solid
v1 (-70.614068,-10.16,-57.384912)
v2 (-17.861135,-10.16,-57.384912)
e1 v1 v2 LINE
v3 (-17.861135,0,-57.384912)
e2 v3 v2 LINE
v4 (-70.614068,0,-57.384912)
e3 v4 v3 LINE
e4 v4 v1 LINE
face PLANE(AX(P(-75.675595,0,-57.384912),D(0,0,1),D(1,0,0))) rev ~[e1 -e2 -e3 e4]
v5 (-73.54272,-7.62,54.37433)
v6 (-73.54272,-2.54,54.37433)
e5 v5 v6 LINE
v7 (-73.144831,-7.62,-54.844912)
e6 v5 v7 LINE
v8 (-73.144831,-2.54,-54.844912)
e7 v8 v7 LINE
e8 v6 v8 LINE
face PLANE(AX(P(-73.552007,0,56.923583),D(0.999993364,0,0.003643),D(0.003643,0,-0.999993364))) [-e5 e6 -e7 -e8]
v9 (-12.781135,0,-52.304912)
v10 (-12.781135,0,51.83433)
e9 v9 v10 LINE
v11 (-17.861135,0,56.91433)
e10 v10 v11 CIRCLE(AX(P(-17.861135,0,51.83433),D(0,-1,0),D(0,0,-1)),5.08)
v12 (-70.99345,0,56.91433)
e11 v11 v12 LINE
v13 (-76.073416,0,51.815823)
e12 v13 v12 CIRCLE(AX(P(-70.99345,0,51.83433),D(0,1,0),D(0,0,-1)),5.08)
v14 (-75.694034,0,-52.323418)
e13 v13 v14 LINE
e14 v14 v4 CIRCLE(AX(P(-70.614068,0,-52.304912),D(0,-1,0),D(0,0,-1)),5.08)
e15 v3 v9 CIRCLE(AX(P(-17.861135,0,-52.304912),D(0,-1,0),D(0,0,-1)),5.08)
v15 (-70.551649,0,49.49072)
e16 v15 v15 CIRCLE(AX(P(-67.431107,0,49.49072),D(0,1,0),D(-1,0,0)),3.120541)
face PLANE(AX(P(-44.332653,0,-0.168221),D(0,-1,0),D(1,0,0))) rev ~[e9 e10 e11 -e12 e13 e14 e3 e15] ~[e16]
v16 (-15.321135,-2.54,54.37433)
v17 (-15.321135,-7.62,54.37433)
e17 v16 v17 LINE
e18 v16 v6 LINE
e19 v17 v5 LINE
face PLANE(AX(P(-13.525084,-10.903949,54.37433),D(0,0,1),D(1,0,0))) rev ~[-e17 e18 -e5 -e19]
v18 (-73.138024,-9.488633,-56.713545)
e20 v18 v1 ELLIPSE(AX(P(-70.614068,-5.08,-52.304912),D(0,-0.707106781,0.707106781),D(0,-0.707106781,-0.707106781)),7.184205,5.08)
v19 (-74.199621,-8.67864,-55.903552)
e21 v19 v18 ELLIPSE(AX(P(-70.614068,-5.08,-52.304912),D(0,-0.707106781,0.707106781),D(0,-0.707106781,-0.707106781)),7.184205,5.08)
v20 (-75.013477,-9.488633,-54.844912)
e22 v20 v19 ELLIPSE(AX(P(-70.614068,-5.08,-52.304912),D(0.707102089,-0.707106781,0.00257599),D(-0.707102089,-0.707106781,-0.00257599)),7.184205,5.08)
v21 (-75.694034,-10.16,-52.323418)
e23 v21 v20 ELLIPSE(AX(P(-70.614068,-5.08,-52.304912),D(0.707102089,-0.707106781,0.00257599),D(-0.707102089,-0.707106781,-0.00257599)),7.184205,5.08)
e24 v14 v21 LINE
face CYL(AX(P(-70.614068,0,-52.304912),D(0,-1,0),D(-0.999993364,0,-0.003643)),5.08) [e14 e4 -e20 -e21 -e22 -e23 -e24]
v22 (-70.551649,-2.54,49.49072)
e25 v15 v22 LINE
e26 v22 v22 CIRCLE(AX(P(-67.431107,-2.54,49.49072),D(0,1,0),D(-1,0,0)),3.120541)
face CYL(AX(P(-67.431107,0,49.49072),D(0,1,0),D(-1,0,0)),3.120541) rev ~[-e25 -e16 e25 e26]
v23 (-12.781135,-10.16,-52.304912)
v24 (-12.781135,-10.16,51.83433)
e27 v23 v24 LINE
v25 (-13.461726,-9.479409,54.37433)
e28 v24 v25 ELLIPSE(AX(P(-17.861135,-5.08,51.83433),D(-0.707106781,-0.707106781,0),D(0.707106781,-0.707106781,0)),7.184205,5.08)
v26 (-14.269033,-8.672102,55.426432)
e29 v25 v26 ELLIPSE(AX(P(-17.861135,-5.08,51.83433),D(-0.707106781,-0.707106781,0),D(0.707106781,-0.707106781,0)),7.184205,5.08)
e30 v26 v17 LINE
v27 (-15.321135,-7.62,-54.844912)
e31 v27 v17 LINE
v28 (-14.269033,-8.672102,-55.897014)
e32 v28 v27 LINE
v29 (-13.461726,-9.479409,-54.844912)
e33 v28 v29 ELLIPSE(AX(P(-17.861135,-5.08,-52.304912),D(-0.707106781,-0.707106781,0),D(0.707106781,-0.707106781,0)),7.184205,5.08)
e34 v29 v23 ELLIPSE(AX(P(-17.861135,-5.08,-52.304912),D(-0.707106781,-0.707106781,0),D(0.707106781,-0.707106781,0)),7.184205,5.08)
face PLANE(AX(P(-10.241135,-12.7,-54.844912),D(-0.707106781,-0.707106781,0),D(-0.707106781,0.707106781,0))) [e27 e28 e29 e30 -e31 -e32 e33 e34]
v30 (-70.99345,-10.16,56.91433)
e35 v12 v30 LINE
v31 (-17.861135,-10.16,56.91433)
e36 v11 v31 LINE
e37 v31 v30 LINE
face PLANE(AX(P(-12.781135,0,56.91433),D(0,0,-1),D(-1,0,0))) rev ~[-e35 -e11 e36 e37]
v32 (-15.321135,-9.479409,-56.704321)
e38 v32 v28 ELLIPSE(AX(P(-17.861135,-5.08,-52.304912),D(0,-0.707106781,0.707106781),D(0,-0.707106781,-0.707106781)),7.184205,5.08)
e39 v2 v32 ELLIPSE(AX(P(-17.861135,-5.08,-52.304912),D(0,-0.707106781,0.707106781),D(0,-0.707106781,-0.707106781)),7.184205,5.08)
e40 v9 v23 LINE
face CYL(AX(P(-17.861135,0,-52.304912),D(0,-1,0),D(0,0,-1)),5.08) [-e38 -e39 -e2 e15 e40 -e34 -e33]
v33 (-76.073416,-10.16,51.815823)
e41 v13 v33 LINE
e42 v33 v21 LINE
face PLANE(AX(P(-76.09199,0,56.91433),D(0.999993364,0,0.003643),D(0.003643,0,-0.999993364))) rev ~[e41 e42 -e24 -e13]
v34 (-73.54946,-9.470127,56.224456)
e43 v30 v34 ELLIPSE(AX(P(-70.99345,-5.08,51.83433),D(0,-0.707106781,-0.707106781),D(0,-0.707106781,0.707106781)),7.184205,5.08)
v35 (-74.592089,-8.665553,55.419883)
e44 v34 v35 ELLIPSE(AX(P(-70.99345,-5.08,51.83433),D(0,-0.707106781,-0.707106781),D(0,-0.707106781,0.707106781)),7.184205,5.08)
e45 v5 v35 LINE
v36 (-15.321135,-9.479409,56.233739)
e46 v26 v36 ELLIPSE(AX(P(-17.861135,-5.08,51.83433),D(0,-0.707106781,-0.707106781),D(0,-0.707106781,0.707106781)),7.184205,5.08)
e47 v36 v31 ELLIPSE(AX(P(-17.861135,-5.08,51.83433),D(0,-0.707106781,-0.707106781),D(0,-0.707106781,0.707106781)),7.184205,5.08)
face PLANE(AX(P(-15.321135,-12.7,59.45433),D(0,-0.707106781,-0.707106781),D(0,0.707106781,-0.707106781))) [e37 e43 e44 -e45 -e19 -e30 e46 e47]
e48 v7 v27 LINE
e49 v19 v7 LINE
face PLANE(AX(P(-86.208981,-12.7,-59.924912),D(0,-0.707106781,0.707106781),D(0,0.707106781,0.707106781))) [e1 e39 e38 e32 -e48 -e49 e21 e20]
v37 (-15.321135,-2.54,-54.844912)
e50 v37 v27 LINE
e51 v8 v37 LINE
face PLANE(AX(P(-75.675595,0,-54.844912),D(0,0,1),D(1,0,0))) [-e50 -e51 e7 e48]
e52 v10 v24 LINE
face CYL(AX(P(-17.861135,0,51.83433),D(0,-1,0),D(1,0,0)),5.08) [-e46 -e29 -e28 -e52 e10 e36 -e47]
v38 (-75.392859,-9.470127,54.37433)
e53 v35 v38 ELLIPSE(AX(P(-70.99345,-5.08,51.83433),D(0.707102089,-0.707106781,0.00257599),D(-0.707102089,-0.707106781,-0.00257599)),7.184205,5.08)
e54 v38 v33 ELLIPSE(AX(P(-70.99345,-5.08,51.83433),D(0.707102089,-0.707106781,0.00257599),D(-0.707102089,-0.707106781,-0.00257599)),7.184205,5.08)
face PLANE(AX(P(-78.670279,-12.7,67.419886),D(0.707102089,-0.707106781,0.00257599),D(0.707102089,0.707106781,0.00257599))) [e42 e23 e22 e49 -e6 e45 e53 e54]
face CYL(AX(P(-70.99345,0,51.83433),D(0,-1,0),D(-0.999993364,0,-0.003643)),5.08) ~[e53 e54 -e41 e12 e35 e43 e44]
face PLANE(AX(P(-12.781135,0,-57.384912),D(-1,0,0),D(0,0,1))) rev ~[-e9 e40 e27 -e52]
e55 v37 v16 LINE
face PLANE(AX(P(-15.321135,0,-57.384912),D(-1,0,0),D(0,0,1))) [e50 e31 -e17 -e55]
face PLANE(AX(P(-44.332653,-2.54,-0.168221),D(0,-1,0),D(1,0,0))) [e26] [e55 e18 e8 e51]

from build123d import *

# Parameters (mm, degrees)
F1_DEPTH     = 12.7
F2_T         = -2.54
F3_R         = 5.08
F4_T1_DEPTH  = 109.2192415341
F4_T6_DEPTH  = 70.8878458195
F4_T11_DEPTH = 71.2857341695
F4_T16_DEPTH = 135.3482654479
F4_T23_DEPTH = 70.8878458195
F4_S24_R     = 5.08
F4_T25_DEPTH = 37
F4_T29_DEPTH = 135.3482654479
F4_S30_R     = 5.08
F4_T31_DEPTH = 69
F4_T38_DEPTH = 122.283391113
F4_S39_R     = 5.08
F4_T40_DEPTH = 63
F4_T44_DEPTH = 83.9519953984
F4_S45_R     = 5.08
F4_T46_DEPTH = 44
F4_T53_DEPTH = 84.3498837483
F4_S54_R     = 5.08
F4_T55_DEPTH = 44
F4_T59_DEPTH = 122.283391113
F4_S60_R     = 5.08
F4_T61_DEPTH = 63
F4_T68_DEPTH = 71.2857341695
F4_S69_R     = 5.08
F4_T70_DEPTH = 37
F4_T74_DEPTH = 135.3482654479
F4_S75_R     = 5.08
F4_T76_DEPTH = 69
F5_R         = 3.1205414485
F6_DEPTH     = 25.4


# Not quite as in the source:
# - a fillet or chamfer that OpenCascade refuses, or shapes differently, is made with other operations: its cross-section is extruded or revolved along the edge and cut away or added


with BuildPart() as f1:
    # F0 (on Front) → F1 (new body)
    with BuildSketch(Plane.XZ):
        Polygon((-76.0919898748, 56.9143295288), (-75.6755949615, -57.3849120053), (-12.7811351476, -57.3849120053), (-12.7811351476, 56.9143295288), align=None)
    extrude(amount=F1_DEPTH)

    # F2
    f2_openings = [f1.faces().sort_by_distance(p)[0] for p in [
        (-44.332578, -12.7, -0.172439),
    ]]
    offset(amount=F2_T, openings=f2_openings)

    # F3
    f3_edges = [f1.edges().sort_by_distance(p)[0] for p in [
        (-12.781135, -6.35, 56.91433),
        (-76.09199, -6.35, 56.91433),
        (-12.781135, -6.35, -57.384912),
        (-75.675595, -6.35, -57.384912),
    ]]
    fillet(f3_edges, radius=F3_R)

    # F4: chamfer of 5.08 on 4 edges, made by hand

    # F4_s2 → F4_t1 (cut)
    with BuildSketch(Plane.XY.offset(-54.8449120053)):
        Polygon((-10.2411351476, -12.7), (-15.3211351476, -7.62), (-15.3211351476, -12.7), align=None)
    extrude(amount=F4_T1_DEPTH, mode=Mode.SUBTRACT)


with BuildPart() as f4_tool4:
    # F4_s5 → F4_t6 (new body)
    with BuildSketch(Plane.YZ.offset(-86.2089809671)):
        Polygon((-12.7, -59.9249120053), (-7.62, -54.8449120053), (-12.7, -54.8449120053), align=None)
    extrude(amount=F4_T6_DEPTH)

    split(bisect_by=Plane(origin=(-73.3436593453, 0, -0.2671927326), x_dir=(0, 1, 0), z_dir=(0.9999933643, 0, 0.0036430001)), keep=Keep.TOP)


with BuildPart() as f1_1:
    add(f1.part)

    # F4_t3: cut F4_tool4
    add(f4_tool4.part, mode=Mode.SUBTRACT)


with BuildPart() as f4_tool9:
    # F4_s10 → F4_t11 (new body)
    with BuildSketch(Plane.YZ.offset(-15.3211351476)):
        Polygon((-12.7, 59.4543295288), (-7.62, 54.3743295288), (-12.7, 54.3743295288), align=None)
    extrude(amount=-F4_T11_DEPTH)

    split(bisect_by=Plane(origin=(-73.3436593453, 0, -0.2671927326), x_dir=(0, 1, 0), z_dir=(0.9999933643, 0, 0.0036430001)), keep=Keep.TOP)


with BuildPart() as f1_2:
    add(f1_1.part)

    # F4_t8: cut F4_tool9
    add(f4_tool9.part, mode=Mode.SUBTRACT)


with BuildPart() as f4_tool14:
    # F4_s15 → F4_t16 (new body)
    with BuildSketch(Plane(origin=(-0.2466530914, 0, 67.7055851499), x_dir=(0, 1, 0), z_dir=(0.0036430001, 0, -0.9999933643))):
        Polygon((-12.7, -78.4241460385), (-7.62, -73.3441460385), (-12.7, -73.3441460385), align=None)
    extrude(amount=F4_T16_DEPTH)

    split(bisect_by=Plane.XY.offset(54.3743295288), keep=Keep.BOTTOM)

    split(bisect_by=Plane.XY.offset(-54.8449120053), keep=Keep.TOP)


with BuildPart() as f1_3:
    add(f1_2.part)

    # F4_t13: cut F4_tool14
    add(f4_tool14.part, mode=Mode.SUBTRACT)


with BuildPart() as f4_tool21:
    # F4_s22 → F4_t23 (new body)
    with BuildSketch(Plane.YZ.offset(-86.2089809671)):
        Polygon((-12.7, -59.9249120053), (-7.62, -54.8449120053), (-12.7, -54.8449120053), align=None)
    extrude(amount=F4_T23_DEPTH)

    # F4_s24 → F4_t25 (intersect, symmetric)
    with BuildSketch(Plane.XZ.offset(10.2)):
        with Locations((-70.614067815, -52.3049120053)):
            Circle(F4_S24_R)
    extrude(amount=F4_T25_DEPTH, both=True, mode=Mode.INTERSECT)

    split(bisect_by=Plane(origin=(-73.3436593453, 0, -0.2671927326), x_dir=(0, 1, 0), z_dir=(-0.9999933643, 0, -0.0036430001)), keep=Keep.TOP)


with BuildPart() as f4_tool27:
    # F4_s28 → F4_t29 (new body)
    with BuildSketch(Plane(origin=(-0.2466530914, 0, 67.7055851499), x_dir=(0, 1, 0), z_dir=(0.0036430001, 0, -0.9999933643))):
        Polygon((-12.7, -78.4241460385), (-7.62, -73.3441460385), (-12.7, -73.3441460385), align=None)
    extrude(amount=F4_T29_DEPTH)

    # F4_s30 → F4_t31 (intersect, symmetric)
    with BuildSketch(Plane.XZ.offset(10.2)):
        with Locations((-70.614067815, -52.3049120053)):
            Circle(F4_S30_R)
    extrude(amount=F4_T31_DEPTH, both=True, mode=Mode.INTERSECT)

    split(bisect_by=Plane.XY.offset(-54.8449120053), keep=Keep.BOTTOM)


with BuildPart() as f4_tool21_1:
    add(f4_tool21.part)

    # F4_t33: intersect F4_tool27
    add(f4_tool27.part, mode=Mode.INTERSECT)


with BuildPart() as f1_4:
    add(f1_3.part)

    # F4_t19: cut F4_tool21
    add(f4_tool21_1.part, mode=Mode.SUBTRACT)


with BuildPart() as f4_tool36:
    # F4_s37 → F4_t38 (new body)
    with BuildSketch(Plane.XY.offset(-67.9090615842)):
        Polygon((-10.2411351476, -12.7), (-15.3211351476, -7.62), (-15.3211351476, -12.7), align=None)
    extrude(amount=F4_T38_DEPTH)

    # F4_s39 → F4_t40 (intersect, symmetric)
    with BuildSketch(Plane.XZ.offset(10.2)):
        with Locations((-17.8611351476, -52.3049120053)):
            Circle(F4_S39_R)
    extrude(amount=F4_T40_DEPTH, both=True, mode=Mode.INTERSECT)

    split(bisect_by=Plane.XY.offset(-54.8449120053), keep=Keep.BOTTOM)


with BuildPart() as f4_tool42:
    # F4_s43 → F4_t44 (new body)
    with BuildSketch(Plane.YZ.offset(-86.2089809671)):
        Polygon((-12.7, -59.9249120053), (-7.62, -54.8449120053), (-12.7, -54.8449120053), align=None)
    extrude(amount=F4_T44_DEPTH)

    # F4_s45 → F4_t46 (intersect, symmetric)
    with BuildSketch(Plane.XZ.offset(10.2)):
        with Locations((-17.8611351476, -52.3049120053)):
            Circle(F4_S45_R)
    extrude(amount=F4_T46_DEPTH, both=True, mode=Mode.INTERSECT)

    split(bisect_by=Plane.YZ.offset(-15.3211351476), keep=Keep.TOP)


with BuildPart() as f4_tool36_1:
    add(f4_tool36.part)

    # F4_t48: intersect F4_tool42
    add(f4_tool42.part, mode=Mode.INTERSECT)


with BuildPart() as f1_5:
    add(f1_4.part)

    # F4_t34: cut F4_tool36
    add(f4_tool36_1.part, mode=Mode.SUBTRACT)


with BuildPart() as f4_tool51:
    # F4_s52 → F4_t53 (new body)
    with BuildSketch(Plane.YZ.offset(-2.2569855688)):
        Polygon((-12.7, 59.4543295288), (-7.62, 54.3743295288), (-12.7, 54.3743295288), align=None)
    extrude(amount=-F4_T53_DEPTH)

    # F4_s54 → F4_t55 (intersect, symmetric)
    with BuildSketch(Plane.XZ.offset(10.2)):
        with Locations((-17.8611351476, 51.8343295288)):
            Circle(F4_S54_R)
    extrude(amount=F4_T55_DEPTH, both=True, mode=Mode.INTERSECT)

    split(bisect_by=Plane.YZ.offset(-15.3211351476), keep=Keep.TOP)


with BuildPart() as f4_tool57:
    # F4_s58 → F4_t59 (new body)
    with BuildSketch(Plane.XY.offset(-54.8449120053)):
        Polygon((-10.2411351476, -12.7), (-15.3211351476, -7.62), (-15.3211351476, -12.7), align=None)
    extrude(amount=F4_T59_DEPTH)

    # F4_s60 → F4_t61 (intersect, symmetric)
    with BuildSketch(Plane.XZ.offset(10.2)):
        with Locations((-17.8611351476, 51.8343295288)):
            Circle(F4_S60_R)
    extrude(amount=F4_T61_DEPTH, both=True, mode=Mode.INTERSECT)

    split(bisect_by=Plane.XY.offset(54.3743295288), keep=Keep.TOP)


with BuildPart() as f4_tool51_1:
    add(f4_tool51.part)

    # F4_t63: intersect F4_tool57
    add(f4_tool57.part, mode=Mode.INTERSECT)


with BuildPart() as f1_6:
    add(f1_5.part)

    # F4_t49: cut F4_tool51
    add(f4_tool51_1.part, mode=Mode.SUBTRACT)


with BuildPart() as f4_tool66:
    # F4_s67 → F4_t68 (new body)
    with BuildSketch(Plane.YZ.offset(-15.3211351476)):
        Polygon((-12.7, 59.4543295288), (-7.62, 54.3743295288), (-12.7, 54.3743295288), align=None)
    extrude(amount=-F4_T68_DEPTH)

    # F4_s69 → F4_t70 (intersect, symmetric)
    with BuildSketch(Plane.XZ.offset(10.2)):
        with Locations((-70.9934496016, 51.8343295288)):
            Circle(F4_S69_R)
    extrude(amount=F4_T70_DEPTH, both=True, mode=Mode.INTERSECT)

    split(bisect_by=Plane(origin=(-73.3436593453, 0, -0.2671927326), x_dir=(0, 1, 0), z_dir=(-0.9999933643, 0, -0.0036430001)), keep=Keep.TOP)


with BuildPart() as f4_tool72:
    # F4_s73 → F4_t74 (new body)
    with BuildSketch(Plane(origin=(-0.2466530914, 0, 67.7055851499), x_dir=(0, 1, 0), z_dir=(0.0036430001, 0, -0.9999933643))):
        Polygon((-12.7, -78.4241460385), (-7.62, -73.3441460385), (-12.7, -73.3441460385), align=None)
    extrude(amount=F4_T74_DEPTH)

    # F4_s75 → F4_t76 (intersect, symmetric)
    with BuildSketch(Plane.XZ.offset(10.2)):
        with Locations((-70.9934496016, 51.8343295288)):
            Circle(F4_S75_R)
    extrude(amount=F4_T76_DEPTH, both=True, mode=Mode.INTERSECT)

    split(bisect_by=Plane.XY.offset(54.3743295288), keep=Keep.TOP)


with BuildPart() as f4_tool66_1:
    add(f4_tool66.part)

    # F4_t78: intersect F4_tool72
    add(f4_tool72.part, mode=Mode.INTERSECT)


with BuildPart() as f1_7:
    add(f1_6.part)

    # F4_t64: cut F4_tool66
    add(f4_tool66_1.part, mode=Mode.SUBTRACT)

    # F5 (on face) → F6 (cut)
    with BuildSketch(Plane(origin=(0, 0, 0), x_dir=(-1, 0, 0), z_dir=(0, 1, 0))):
        with Locations((67.4311071634, 49.4907200336)):
            Circle(F5_R)
    extrude(amount=-F6_DEPTH, mode=Mode.SUBTRACT)


solid = f1_7.part
